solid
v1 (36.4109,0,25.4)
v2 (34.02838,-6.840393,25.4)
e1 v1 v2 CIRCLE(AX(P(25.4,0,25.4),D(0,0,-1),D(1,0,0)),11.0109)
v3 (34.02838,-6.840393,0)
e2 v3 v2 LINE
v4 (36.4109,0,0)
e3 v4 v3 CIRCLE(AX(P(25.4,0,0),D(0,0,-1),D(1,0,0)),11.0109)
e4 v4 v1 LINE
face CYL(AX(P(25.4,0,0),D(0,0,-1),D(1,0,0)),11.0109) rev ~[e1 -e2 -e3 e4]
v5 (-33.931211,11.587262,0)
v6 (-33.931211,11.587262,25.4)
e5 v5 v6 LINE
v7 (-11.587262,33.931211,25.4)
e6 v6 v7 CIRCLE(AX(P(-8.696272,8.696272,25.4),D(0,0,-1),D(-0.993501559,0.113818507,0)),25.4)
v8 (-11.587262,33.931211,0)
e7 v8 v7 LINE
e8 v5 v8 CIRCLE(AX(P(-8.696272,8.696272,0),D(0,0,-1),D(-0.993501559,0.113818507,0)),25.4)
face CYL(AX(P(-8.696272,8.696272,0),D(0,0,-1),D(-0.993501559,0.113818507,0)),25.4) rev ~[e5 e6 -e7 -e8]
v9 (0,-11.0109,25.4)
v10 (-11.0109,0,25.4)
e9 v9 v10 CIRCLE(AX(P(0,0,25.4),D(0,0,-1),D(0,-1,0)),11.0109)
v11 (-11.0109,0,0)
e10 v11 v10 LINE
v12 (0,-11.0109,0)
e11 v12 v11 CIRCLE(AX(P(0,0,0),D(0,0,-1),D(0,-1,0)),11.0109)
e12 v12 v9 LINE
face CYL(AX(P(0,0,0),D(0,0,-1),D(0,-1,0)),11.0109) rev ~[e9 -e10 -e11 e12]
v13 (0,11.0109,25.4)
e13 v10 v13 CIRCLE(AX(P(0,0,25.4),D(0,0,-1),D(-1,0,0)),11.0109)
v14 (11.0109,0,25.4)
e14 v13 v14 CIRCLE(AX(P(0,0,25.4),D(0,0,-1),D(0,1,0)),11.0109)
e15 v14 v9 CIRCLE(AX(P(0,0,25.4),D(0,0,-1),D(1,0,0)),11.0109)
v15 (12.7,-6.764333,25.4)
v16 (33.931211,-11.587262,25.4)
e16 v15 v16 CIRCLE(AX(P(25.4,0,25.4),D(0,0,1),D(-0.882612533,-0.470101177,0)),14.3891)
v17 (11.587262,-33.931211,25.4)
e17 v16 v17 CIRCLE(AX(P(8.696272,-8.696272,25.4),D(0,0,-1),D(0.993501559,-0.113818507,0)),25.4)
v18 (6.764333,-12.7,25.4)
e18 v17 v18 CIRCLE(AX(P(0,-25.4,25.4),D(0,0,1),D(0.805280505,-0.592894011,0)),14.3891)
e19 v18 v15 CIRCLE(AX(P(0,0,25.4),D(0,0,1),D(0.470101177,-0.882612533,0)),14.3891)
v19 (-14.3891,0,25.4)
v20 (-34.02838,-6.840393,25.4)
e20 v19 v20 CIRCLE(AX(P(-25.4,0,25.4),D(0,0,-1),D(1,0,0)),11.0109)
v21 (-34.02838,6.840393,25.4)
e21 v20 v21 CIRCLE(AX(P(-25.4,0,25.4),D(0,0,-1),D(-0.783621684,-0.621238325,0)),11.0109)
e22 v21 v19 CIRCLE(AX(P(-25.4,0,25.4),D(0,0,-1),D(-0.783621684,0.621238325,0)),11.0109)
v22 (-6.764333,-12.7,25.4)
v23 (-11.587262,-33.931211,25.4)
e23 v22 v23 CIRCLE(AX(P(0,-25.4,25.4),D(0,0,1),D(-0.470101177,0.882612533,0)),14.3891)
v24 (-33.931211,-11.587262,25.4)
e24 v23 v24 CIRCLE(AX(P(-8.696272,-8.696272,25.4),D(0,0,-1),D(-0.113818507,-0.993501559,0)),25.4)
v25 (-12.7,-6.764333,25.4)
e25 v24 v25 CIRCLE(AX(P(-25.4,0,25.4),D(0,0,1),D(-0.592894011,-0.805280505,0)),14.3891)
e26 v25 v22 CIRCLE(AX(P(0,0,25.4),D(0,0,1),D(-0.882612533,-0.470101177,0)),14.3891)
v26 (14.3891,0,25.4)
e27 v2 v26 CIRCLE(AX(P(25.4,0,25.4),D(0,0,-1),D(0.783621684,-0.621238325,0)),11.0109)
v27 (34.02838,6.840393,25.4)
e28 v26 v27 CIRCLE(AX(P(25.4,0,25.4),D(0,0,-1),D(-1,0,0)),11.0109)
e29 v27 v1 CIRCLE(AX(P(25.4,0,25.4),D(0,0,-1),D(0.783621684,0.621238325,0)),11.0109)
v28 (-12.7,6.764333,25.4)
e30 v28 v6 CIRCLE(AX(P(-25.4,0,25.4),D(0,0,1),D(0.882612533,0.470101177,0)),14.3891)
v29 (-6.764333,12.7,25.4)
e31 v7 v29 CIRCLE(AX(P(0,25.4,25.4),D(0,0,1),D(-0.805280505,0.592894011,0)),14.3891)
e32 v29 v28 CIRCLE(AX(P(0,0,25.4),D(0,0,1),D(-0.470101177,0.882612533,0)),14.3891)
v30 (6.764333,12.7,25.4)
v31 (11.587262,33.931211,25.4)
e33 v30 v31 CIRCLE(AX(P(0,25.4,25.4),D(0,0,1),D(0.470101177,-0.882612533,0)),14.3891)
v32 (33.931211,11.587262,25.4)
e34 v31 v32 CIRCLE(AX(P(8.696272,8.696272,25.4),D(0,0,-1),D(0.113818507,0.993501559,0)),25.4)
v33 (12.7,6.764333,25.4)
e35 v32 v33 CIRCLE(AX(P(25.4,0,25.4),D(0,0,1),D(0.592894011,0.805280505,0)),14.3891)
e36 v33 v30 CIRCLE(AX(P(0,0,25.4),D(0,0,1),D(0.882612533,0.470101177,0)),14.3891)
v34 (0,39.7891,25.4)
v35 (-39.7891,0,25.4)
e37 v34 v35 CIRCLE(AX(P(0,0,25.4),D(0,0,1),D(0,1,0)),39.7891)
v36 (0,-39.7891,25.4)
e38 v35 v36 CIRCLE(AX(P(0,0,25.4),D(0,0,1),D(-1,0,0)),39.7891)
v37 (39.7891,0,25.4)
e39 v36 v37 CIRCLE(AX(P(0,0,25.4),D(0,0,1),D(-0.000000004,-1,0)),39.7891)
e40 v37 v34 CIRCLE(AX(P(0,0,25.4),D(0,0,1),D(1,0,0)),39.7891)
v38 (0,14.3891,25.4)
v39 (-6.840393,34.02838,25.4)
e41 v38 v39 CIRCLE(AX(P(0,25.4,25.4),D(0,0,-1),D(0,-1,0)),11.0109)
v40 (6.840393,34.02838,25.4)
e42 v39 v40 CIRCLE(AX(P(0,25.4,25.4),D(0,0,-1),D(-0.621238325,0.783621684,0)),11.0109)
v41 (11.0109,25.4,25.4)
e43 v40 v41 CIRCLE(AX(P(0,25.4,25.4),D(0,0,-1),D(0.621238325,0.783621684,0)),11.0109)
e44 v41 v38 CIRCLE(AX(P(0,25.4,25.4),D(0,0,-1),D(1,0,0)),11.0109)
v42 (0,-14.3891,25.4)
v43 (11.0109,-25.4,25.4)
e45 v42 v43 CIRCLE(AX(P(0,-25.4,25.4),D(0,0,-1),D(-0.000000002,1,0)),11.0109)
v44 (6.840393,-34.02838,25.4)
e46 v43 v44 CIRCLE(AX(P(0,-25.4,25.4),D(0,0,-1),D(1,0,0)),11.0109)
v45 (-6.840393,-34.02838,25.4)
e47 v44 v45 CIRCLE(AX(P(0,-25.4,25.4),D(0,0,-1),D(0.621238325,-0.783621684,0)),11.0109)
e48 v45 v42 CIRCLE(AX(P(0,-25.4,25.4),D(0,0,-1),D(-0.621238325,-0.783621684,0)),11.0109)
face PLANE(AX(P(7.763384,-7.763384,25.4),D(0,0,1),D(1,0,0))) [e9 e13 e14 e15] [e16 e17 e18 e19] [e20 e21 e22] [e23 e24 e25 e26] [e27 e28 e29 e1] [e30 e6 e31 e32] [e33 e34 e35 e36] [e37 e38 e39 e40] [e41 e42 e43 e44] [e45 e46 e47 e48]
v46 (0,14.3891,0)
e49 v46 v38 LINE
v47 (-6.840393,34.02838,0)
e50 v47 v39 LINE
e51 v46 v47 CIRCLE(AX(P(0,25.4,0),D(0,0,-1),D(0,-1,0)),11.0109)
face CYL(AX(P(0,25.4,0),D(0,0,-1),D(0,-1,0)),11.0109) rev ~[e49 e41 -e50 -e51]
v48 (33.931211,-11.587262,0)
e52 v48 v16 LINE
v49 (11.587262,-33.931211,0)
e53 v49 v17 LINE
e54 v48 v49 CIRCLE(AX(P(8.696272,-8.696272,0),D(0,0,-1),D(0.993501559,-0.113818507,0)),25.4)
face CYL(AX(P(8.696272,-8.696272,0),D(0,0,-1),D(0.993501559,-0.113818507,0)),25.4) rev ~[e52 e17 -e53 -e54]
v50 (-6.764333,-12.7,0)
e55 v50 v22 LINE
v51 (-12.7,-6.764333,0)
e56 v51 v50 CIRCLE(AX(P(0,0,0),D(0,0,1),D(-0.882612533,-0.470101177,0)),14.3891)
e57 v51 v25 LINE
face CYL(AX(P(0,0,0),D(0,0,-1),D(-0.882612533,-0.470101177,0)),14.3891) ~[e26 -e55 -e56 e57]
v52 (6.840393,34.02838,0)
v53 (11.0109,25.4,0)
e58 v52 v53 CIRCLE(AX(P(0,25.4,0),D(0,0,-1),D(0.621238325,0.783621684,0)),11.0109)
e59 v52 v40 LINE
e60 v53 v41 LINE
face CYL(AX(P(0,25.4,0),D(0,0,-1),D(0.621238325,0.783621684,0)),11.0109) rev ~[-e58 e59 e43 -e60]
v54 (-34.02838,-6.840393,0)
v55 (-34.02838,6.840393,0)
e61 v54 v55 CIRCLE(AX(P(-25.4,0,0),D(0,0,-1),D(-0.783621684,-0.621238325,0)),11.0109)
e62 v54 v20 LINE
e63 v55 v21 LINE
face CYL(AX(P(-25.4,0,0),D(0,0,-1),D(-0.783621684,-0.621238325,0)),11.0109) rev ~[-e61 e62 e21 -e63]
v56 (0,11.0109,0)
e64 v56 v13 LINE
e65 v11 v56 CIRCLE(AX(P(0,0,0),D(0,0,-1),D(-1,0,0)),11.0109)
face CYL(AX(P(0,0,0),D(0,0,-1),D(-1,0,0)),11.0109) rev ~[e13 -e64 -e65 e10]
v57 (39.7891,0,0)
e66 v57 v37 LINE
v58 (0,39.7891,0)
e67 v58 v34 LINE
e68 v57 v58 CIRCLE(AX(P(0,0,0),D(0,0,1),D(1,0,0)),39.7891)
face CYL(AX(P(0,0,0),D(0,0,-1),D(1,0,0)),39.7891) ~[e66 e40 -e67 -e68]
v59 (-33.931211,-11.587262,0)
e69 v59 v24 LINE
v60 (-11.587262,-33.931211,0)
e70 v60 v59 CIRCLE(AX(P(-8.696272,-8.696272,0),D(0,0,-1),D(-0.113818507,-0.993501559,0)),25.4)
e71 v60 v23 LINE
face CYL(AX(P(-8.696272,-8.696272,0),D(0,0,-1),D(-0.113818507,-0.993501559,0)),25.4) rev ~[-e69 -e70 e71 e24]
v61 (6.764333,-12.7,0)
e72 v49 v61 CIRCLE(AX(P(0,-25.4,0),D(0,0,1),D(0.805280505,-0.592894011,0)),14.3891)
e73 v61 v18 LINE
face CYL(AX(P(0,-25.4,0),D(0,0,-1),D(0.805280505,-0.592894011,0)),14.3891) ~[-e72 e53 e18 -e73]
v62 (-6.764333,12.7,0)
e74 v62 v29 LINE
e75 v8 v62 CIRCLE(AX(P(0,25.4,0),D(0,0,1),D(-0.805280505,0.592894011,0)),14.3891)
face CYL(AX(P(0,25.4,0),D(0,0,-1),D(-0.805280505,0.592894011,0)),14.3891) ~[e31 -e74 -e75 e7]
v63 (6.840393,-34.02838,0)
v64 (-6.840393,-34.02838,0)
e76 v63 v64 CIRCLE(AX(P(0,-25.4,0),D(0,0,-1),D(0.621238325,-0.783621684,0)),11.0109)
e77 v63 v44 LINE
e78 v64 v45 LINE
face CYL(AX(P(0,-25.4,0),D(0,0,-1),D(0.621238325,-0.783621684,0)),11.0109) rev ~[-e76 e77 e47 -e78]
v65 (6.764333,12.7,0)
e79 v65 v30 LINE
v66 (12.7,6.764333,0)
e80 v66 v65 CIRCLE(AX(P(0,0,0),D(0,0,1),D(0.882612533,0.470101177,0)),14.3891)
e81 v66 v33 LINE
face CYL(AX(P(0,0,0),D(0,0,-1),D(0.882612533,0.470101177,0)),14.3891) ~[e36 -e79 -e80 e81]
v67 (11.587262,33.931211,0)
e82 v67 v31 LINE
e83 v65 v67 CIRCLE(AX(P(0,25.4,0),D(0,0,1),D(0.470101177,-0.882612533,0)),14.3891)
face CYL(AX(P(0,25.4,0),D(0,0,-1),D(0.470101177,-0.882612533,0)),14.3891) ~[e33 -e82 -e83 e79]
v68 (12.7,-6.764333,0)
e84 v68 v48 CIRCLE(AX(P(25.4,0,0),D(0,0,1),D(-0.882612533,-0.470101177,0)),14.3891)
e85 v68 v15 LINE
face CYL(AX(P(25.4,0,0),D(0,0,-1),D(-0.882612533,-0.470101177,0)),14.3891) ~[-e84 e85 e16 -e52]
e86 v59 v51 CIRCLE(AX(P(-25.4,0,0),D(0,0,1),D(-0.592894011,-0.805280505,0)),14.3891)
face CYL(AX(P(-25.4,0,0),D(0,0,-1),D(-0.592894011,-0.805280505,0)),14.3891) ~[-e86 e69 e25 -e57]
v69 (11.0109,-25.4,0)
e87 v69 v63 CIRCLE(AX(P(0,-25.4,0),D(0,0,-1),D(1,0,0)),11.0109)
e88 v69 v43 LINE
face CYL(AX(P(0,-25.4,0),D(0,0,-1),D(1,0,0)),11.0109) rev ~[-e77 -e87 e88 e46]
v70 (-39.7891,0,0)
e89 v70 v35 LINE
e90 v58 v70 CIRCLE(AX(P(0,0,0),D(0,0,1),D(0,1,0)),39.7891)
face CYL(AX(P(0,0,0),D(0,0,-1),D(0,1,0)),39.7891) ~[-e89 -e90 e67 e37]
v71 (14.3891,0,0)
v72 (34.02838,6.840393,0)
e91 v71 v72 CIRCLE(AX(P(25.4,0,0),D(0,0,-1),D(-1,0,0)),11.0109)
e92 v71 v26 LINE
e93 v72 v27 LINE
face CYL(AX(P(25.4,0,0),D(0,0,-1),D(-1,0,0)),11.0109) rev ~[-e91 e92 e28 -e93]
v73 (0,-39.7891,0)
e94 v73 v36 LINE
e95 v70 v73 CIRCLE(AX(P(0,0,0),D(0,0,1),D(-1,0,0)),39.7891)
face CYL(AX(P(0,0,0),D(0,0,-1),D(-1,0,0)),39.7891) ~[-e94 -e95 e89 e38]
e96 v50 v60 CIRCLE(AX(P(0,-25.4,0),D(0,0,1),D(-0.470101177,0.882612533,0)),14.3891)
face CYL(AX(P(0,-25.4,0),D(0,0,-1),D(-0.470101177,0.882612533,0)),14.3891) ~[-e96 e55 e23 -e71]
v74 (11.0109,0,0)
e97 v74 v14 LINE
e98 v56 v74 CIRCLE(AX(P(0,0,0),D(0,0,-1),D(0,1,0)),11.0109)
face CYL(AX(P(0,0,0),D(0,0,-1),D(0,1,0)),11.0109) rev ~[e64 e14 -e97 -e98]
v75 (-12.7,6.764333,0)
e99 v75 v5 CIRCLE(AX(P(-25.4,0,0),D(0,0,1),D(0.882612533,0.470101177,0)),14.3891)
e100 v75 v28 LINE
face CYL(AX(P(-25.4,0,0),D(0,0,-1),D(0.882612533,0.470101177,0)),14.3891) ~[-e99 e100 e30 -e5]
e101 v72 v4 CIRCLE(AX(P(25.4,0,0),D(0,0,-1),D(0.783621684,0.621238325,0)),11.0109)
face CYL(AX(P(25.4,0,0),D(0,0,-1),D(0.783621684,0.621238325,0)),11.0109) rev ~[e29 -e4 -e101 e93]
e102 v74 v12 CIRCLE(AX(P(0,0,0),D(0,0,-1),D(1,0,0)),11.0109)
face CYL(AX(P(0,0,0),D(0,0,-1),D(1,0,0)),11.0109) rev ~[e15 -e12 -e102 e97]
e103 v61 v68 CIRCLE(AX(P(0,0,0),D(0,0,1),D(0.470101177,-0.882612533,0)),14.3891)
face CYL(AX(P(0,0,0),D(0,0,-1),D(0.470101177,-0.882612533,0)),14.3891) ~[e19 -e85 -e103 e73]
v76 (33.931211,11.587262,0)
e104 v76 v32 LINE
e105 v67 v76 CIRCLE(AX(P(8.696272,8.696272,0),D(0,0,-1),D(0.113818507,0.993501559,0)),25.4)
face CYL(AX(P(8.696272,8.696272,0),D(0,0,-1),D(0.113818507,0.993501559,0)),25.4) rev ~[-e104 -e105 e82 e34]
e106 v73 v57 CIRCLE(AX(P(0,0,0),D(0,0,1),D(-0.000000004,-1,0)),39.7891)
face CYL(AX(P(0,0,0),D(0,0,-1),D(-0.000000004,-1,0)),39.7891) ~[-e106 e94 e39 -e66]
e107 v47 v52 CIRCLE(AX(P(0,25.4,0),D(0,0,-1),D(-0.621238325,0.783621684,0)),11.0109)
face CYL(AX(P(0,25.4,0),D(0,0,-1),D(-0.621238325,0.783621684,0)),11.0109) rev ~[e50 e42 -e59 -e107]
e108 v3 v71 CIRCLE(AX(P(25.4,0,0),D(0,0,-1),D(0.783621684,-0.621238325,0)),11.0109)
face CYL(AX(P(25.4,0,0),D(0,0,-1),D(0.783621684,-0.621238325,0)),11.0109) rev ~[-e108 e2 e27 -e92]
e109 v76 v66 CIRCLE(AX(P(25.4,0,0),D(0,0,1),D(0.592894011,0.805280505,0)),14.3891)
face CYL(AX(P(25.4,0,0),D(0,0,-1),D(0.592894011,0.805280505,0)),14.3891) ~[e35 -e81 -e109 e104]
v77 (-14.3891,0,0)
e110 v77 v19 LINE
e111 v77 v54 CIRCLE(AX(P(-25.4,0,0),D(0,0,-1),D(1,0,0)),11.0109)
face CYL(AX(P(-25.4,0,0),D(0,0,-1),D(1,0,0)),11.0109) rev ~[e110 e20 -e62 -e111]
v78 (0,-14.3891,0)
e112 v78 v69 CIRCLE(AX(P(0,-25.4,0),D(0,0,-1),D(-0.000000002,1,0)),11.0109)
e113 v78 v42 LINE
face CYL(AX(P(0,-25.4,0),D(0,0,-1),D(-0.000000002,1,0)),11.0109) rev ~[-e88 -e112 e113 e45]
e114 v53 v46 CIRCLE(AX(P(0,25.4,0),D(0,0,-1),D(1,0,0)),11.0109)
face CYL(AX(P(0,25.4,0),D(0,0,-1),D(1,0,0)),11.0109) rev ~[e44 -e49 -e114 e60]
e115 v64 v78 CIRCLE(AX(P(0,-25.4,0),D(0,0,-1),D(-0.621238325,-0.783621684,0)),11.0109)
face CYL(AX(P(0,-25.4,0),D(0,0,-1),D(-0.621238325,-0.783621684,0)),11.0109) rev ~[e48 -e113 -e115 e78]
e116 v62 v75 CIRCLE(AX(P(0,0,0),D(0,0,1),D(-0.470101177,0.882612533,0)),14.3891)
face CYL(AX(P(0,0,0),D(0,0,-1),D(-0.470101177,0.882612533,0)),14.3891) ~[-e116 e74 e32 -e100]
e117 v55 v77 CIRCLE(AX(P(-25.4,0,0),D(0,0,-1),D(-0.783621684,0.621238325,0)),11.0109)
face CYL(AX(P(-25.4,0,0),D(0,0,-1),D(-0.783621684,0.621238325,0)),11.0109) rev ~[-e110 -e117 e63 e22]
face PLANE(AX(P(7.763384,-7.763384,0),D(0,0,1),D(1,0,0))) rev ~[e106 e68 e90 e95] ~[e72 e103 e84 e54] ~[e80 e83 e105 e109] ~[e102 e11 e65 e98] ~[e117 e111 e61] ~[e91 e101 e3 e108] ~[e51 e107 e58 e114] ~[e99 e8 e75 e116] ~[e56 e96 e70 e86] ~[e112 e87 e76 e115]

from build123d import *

# Parameters (mm, degrees)
F1_DEPTH = 25.4


# Not quite as in the source:
# - a feature names something its author has since deleted; it is built from what else it names


with BuildPart() as f1:
    # F0 (on Top) → F1 (new body)
    with BuildSketch(Plane.XY):
        with BuildLine():
            ThreePointArc((12.7, -6.7643328429), (11.4395600211, -3.4860169829), (11.0109, 0))
            ThreePointArc((11.0109, 0), (7.785882057, -7.785882057), (0, -11.0109))
            ThreePointArc((0, -11.0109), (3.4860169829, -11.4395600211), (6.7643328429, -12.7))
            ThreePointArc((6.7643328429, -12.7), (10.1746301852, -10.1746301852), (12.7, -6.7643328429))
        make_face()
        with BuildLine():
            ThreePointArc((-11.0109, 0), (-7.785882056, 7.7858820579), (2.7e-09, 11.0109))
            ThreePointArc((2.7e-09, 11.0109), (-3.4860169816, 11.4395600208), (-6.7643328429, 12.7))
            ThreePointArc((-6.7643328429, 12.7), (-10.1746301852, 10.1746301852), (-12.7, 6.7643328429))
            ThreePointArc((-12.7, 6.7643328429), (-11.4395600211, 3.4860169829), (-11.0109, 0))
        make_face()
        with BuildLine():
            ThreePointArc((6.7643328429, 12.7), (3.4860169842, 11.4395600214), (2.7e-09, 11.0109))
            ThreePointArc((2.7e-09, 11.0109), (7.7858820579, 7.785882056), (11.0109, 0))
            ThreePointArc((11.0109, 0), (11.4395600211, 3.4860169829), (12.7, 6.7643328429))
            ThreePointArc((12.7, 6.7643328429), (10.1746301852, 10.1746301852), (6.7643328429, 12.7))
        make_face()
        with BuildLine():
            ThreePointArc((0, -11.0109), (-7.785882057, -7.785882057), (-11.0109, 0))
            ThreePointArc((-11.0109, 0), (-11.4395600211, -3.4860169829), (-12.7, -6.7643328429))
            ThreePointArc((-12.7, -6.7643328429), (-10.1746301852, -10.1746301852), (-6.7643328429, -12.7))
            ThreePointArc((-6.7643328429, -12.7), (-3.4860169829, -11.4395600211), (0, -11.0109))
        make_face()
        with BuildLine():
            ThreePointArc((-6.8403930724, 34.02838), (0, 36.4109), (6.8403930724, 34.02838))
            ThreePointArc((6.8403930724, 34.02838), (9.216102766, 34.090951688), (11.5872617117, 33.9312112173))
            ThreePointArc((11.5872617117, 33.9312112173), (6.4919083282, 38.2413910878), (0, 39.7891))
            ThreePointArc((0, 39.7891), (-6.4919083282, 38.2413910878), (-11.5872617117, 33.9312112173))
            ThreePointArc((-11.5872617117, 33.9312112173), (-9.216102766, 34.090951688), (-6.8403930724, 34.02838))
        make_face()
        with BuildLine():
            ThreePointArc((0, 39.7891), (6.4919083282, 38.2413910878), (11.5872617117, 33.9312112173))
            ThreePointArc((11.5872617117, 33.9312112173), (26.6567838655, 26.6567838655), (33.9312112173, 11.5872617117))
            ThreePointArc((33.9312112173, 11.5872617117), (38.2413910878, 6.4919083282), (39.7891, 0))
            ThreePointArc((39.7891, 0), (28.1351424273, 28.1351424273), (0, 39.7891))
        make_face()
        with BuildLine():
            ThreePointArc((6.8403930724, 34.02838), (9.9135967966, 30.1917134059), (11.0109, 25.4))
            ThreePointArc((11.0109, 25.4), (7.7858820586, 17.6141179447), (4.7e-09, 14.3891))
            ThreePointArc((4.7e-09, 14.3891), (3.4860169852, 13.9604399783), (6.7643328429, 12.7))
            ThreePointArc((6.7643328429, 12.7), (12.3365080254, 17.9934644705), (14.3891, 25.4))
            ThreePointArc((14.3891, 25.4), (13.6707071197, 29.8897623163), (11.5872617117, 33.9312112173))
            ThreePointArc((11.5872617117, 33.9312112173), (9.216102766, 34.090951688), (6.8403930724, 34.02838))
        make_face()
        with BuildLine():
            ThreePointArc((-6.7643328429, 12.7), (-3.4860169806, 13.9604399795), (4.7e-09, 14.3891))
            ThreePointArc((4.7e-09, 14.3891), (-10.3982245629, 21.7782815197), (-6.8403930724, 34.02838))
            ThreePointArc((-6.8403930724, 34.02838), (-9.216102766, 34.090951688), (-11.5872617117, 33.9312112173))
            ThreePointArc((-11.5872617117, 33.9312112173), (-14.0316192263, 22.2125463616), (-6.7643328429, 12.7))
        make_face()
        with BuildLine():
            ThreePointArc((-33.9312112173, 11.5872617117), (-26.6567838655, 26.6567838655), (-11.5872617117, 33.9312112173))
            ThreePointArc((-11.5872617117, 33.9312112173), (-6.4919083282, 38.2413910878), (0, 39.7891))
            ThreePointArc((0, 39.7891), (-28.1351424273, 28.1351424273), (-39.7891, 0))
            ThreePointArc((-39.7891, 0), (-38.2413910878, 6.4919083282), (-33.9312112173, 11.5872617117))
        make_face()
        with BuildLine():
            ThreePointArc((-34.02838, 6.8403930724), (-34.090951688, 9.216102766), (-33.9312112173, 11.5872617117))
            ThreePointArc((-33.9312112173, 11.5872617117), (-38.2413910878, 6.4919083282), (-39.7891, 0))
            ThreePointArc((-39.7891, 0), (-38.2413910878, -6.4919083282), (-33.9312112173, -11.5872617117))
            ThreePointArc((-33.9312112173, -11.5872617117), (-34.090951688, -9.216102766), (-34.02838, -6.8403930724))
            ThreePointArc((-34.02838, -6.8403930724), (-36.4109, 0), (-34.02838, 6.8403930724))
        make_face()
        with BuildLine():
            ThreePointArc((-12.7, -6.7643328429), (-13.9604399789, -3.4860169829), (-14.3891, 0))
            ThreePointArc((-14.3891, 0), (-21.778281522, -10.3982245636), (-34.02838, -6.8403930724))
            ThreePointArc((-34.02838, -6.8403930724), (-34.090951688, -9.216102766), (-33.9312112173, -11.5872617117))
            ThreePointArc((-33.9312112173, -11.5872617117), (-22.2125463616, -14.0316192263), (-12.7, -6.7643328429))
        make_face()
        with BuildLine():
            ThreePointArc((-33.9312112173, -11.5872617117), (-38.2413910878, -6.4919083282), (-39.7891, 0))
            ThreePointArc((-39.7891, 0), (-28.1351424844, -28.1351423702), (-1.615e-07, -39.7891))
            ThreePointArc((-1.615e-07, -39.7891), (-6.4919084002, -38.2413910513), (-11.5872617117, -33.9312112173))
            ThreePointArc((-11.5872617117, -33.9312112173), (-26.6567838655, -26.6567838655), (-33.9312112173, -11.5872617117))
        make_face()
        with BuildLine():
            ThreePointArc((-6.8403930724, -34.02838), (-10.3982245667, -21.7782815309), (-1.89e-08, -14.3891))
            ThreePointArc((-1.89e-08, -14.3891), (-3.486016992, -13.9604399766), (-6.7643328429, -12.7))
            ThreePointArc((-6.7643328429, -12.7), (-14.0316192263, -22.2125463616), (-11.5872617117, -33.9312112173))
            ThreePointArc((-11.5872617117, -33.9312112173), (-9.216102766, -34.090951688), (-6.8403930724, -34.02838))
        make_face()
        with BuildLine():
            ThreePointArc((-11.5872617117, -33.9312112173), (-6.4919084002, -38.2413910513), (-1.615e-07, -39.7891))
            ThreePointArc((-1.615e-07, -39.7891), (6.4919082561, -38.2413911242), (11.5872617117, -33.9312112173))
            ThreePointArc((11.5872617117, -33.9312112173), (9.216102766, -34.090951688), (6.8403930724, -34.02838))
            ThreePointArc((6.8403930724, -34.02838), (0, -36.4109), (-6.8403930724, -34.02838))
            ThreePointArc((-6.8403930724, -34.02838), (-9.216102766, -34.090951688), (-11.5872617117, -33.9312112173))
        make_face()
        with BuildLine():
            ThreePointArc((6.7643328429, -12.7), (3.4860169737, -13.9604399812), (-1.89e-08, -14.3891))
            ThreePointArc((-1.89e-08, -14.3891), (7.7858820503, -17.6141179364), (11.0109, -25.4))
            ThreePointArc((11.0109, -25.4), (9.9135967966, -30.1917134059), (6.8403930724, -34.02838))
            ThreePointArc((6.8403930724, -34.02838), (9.216102766, -34.090951688), (11.5872617117, -33.9312112173))
            ThreePointArc((11.5872617117, -33.9312112173), (13.6707071197, -29.8897623163), (14.3891, -25.4))
            ThreePointArc((14.3891, -25.4), (12.3365080254, -17.9934644705), (6.7643328429, -12.7))
        make_face()
        with BuildLine():
            ThreePointArc((-1.615e-07, -39.7891), (28.1351423702, -28.1351424844), (39.7891, 0))
            ThreePointArc((39.7891, 0), (38.2413910878, -6.4919083282), (33.9312112173, -11.5872617117))
            ThreePointArc((33.9312112173, -11.5872617117), (26.6567838655, -26.6567838655), (11.5872617117, -33.9312112173))
            ThreePointArc((11.5872617117, -33.9312112173), (6.4919082561, -38.2413911242), (-1.615e-07, -39.7891))
        make_face()
        with BuildLine():
            ThreePointArc((39.7891, 0), (38.2413910878, 6.4919083282), (33.9312112173, 11.5872617117))
            ThreePointArc((33.9312112173, 11.5872617117), (34.090951688, 9.216102766), (34.02838, 6.8403930724))
            ThreePointArc((34.02838, 6.8403930724), (35.7982245636, 3.621718478), (36.4109, 0))
            ThreePointArc((36.4109, 0), (35.7982245636, -3.621718478), (34.02838, -6.8403930724))
            ThreePointArc((34.02838, -6.8403930724), (34.090951688, -9.216102766), (33.9312112173, -11.5872617117))
            ThreePointArc((33.9312112173, -11.5872617117), (38.2413910878, -6.4919083282), (39.7891, 0))
        make_face()
        with BuildLine():
            ThreePointArc((34.02838, 6.8403930724), (34.090951688, 9.216102766), (33.9312112173, 11.5872617117))
            ThreePointArc((33.9312112173, 11.5872617117), (22.2125463616, 14.0316192263), (12.7, 6.7643328429))
            ThreePointArc((12.7, 6.7643328429), (13.9604399789, 3.4860169829), (14.3891, 0))
            ThreePointArc((14.3891, 0), (21.778281522, 10.3982245636), (34.02838, 6.8403930724))
        make_face()
        with BuildLine():
            ThreePointArc((12.7, 6.7643328429), (11.4395600211, 3.4860169829), (11.0109, 0))
            Line((11.0109, 0), (14.3891, 0))
            ThreePointArc((14.3891, 0), (13.9604399789, 3.4860169829), (12.7, 6.7643328429))
        make_face()
        with BuildLine():
            Line((14.3891, 0), (11.0109, 0))
            ThreePointArc((11.0109, 0), (11.4395600211, -3.4860169829), (12.7, -6.7643328429))
            ThreePointArc((12.7, -6.7643328429), (13.9604399789, -3.4860169829), (14.3891, 0))
        make_face()
        with BuildLine():
            ThreePointArc((34.02838, -6.8403930724), (21.778281522, -10.3982245636), (14.3891, 0))
            ThreePointArc((14.3891, 0), (13.9604399789, -3.4860169829), (12.7, -6.7643328429))
            ThreePointArc((12.7, -6.7643328429), (22.2125463616, -14.0316192263), (33.9312112173, -11.5872617117))
            ThreePointArc((33.9312112173, -11.5872617117), (34.090951688, -9.216102766), (34.02838, -6.8403930724))
        make_face()
        with BuildLine():
            ThreePointArc((6.7643328429, -12.7), (3.4860169829, -11.4395600211), (0, -11.0109))
            Line((0, -11.0109), (0, -14.3891))
            ThreePointArc((-1.89e-08, -14.3891), (3.4860169737, -13.9604399812), (6.7643328429, -12.7))
        make_face()
        with BuildLine():
            Line((0, -14.3891), (0, -11.0109))
            ThreePointArc((0, -11.0109), (-3.4860169829, -11.4395600211), (-6.7643328429, -12.7))
            ThreePointArc((-6.7643328429, -12.7), (-3.486016992, -13.9604399766), (-1.89e-08, -14.3891))
        make_face()
        with BuildLine():
            ThreePointArc((-12.7, -6.7643328429), (-11.4395600211, -3.4860169829), (-11.0109, 0))
            Line((-11.0109, 0), (-14.3891, 0))
            ThreePointArc((-14.3891, 0), (-13.9604399789, -3.4860169829), (-12.7, -6.7643328429))
        make_face()
        with BuildLine():
            Line((-14.3891, 0), (-11.0109, 0))
            ThreePointArc((-11.0109, 0), (-11.4395600211, 3.4860169829), (-12.7, 6.7643328429))
            ThreePointArc((-12.7, 6.7643328429), (-13.9604399789, 3.4860169829), (-14.3891, 0))
        make_face()
        with BuildLine():
            Line((0, 11.0109), (0, 14.3891))
            ThreePointArc((4.7e-09, 14.3891), (-3.4860169806, 13.9604399795), (-6.7643328429, 12.7))
            ThreePointArc((-6.7643328429, 12.7), (-3.4860169816, 11.4395600208), (2.7e-09, 11.0109))
        make_face()
        with BuildLine():
            ThreePointArc((6.7643328429, 12.7), (3.4860169852, 13.9604399783), (4.7e-09, 14.3891))
            Line((0, 14.3891), (0, 11.0109))
            ThreePointArc((2.7e-09, 11.0109), (3.4860169842, 11.4395600214), (6.7643328429, 12.7))
        make_face()
        with BuildLine():
            ThreePointArc((-14.3891, 0), (-13.9604399789, 3.4860169829), (-12.7, 6.7643328429))
            ThreePointArc((-12.7, 6.7643328429), (-22.2125463616, 14.0316192263), (-33.9312112173, 11.5872617117))
            ThreePointArc((-33.9312112173, 11.5872617117), (-34.090951688, 9.216102766), (-34.02838, 6.8403930724))
            ThreePointArc((-34.02838, 6.8403930724), (-21.778281522, 10.3982245636), (-14.3891, 0))
        make_face()
    extrude(amount=F1_DEPTH)


solid = f1.part
